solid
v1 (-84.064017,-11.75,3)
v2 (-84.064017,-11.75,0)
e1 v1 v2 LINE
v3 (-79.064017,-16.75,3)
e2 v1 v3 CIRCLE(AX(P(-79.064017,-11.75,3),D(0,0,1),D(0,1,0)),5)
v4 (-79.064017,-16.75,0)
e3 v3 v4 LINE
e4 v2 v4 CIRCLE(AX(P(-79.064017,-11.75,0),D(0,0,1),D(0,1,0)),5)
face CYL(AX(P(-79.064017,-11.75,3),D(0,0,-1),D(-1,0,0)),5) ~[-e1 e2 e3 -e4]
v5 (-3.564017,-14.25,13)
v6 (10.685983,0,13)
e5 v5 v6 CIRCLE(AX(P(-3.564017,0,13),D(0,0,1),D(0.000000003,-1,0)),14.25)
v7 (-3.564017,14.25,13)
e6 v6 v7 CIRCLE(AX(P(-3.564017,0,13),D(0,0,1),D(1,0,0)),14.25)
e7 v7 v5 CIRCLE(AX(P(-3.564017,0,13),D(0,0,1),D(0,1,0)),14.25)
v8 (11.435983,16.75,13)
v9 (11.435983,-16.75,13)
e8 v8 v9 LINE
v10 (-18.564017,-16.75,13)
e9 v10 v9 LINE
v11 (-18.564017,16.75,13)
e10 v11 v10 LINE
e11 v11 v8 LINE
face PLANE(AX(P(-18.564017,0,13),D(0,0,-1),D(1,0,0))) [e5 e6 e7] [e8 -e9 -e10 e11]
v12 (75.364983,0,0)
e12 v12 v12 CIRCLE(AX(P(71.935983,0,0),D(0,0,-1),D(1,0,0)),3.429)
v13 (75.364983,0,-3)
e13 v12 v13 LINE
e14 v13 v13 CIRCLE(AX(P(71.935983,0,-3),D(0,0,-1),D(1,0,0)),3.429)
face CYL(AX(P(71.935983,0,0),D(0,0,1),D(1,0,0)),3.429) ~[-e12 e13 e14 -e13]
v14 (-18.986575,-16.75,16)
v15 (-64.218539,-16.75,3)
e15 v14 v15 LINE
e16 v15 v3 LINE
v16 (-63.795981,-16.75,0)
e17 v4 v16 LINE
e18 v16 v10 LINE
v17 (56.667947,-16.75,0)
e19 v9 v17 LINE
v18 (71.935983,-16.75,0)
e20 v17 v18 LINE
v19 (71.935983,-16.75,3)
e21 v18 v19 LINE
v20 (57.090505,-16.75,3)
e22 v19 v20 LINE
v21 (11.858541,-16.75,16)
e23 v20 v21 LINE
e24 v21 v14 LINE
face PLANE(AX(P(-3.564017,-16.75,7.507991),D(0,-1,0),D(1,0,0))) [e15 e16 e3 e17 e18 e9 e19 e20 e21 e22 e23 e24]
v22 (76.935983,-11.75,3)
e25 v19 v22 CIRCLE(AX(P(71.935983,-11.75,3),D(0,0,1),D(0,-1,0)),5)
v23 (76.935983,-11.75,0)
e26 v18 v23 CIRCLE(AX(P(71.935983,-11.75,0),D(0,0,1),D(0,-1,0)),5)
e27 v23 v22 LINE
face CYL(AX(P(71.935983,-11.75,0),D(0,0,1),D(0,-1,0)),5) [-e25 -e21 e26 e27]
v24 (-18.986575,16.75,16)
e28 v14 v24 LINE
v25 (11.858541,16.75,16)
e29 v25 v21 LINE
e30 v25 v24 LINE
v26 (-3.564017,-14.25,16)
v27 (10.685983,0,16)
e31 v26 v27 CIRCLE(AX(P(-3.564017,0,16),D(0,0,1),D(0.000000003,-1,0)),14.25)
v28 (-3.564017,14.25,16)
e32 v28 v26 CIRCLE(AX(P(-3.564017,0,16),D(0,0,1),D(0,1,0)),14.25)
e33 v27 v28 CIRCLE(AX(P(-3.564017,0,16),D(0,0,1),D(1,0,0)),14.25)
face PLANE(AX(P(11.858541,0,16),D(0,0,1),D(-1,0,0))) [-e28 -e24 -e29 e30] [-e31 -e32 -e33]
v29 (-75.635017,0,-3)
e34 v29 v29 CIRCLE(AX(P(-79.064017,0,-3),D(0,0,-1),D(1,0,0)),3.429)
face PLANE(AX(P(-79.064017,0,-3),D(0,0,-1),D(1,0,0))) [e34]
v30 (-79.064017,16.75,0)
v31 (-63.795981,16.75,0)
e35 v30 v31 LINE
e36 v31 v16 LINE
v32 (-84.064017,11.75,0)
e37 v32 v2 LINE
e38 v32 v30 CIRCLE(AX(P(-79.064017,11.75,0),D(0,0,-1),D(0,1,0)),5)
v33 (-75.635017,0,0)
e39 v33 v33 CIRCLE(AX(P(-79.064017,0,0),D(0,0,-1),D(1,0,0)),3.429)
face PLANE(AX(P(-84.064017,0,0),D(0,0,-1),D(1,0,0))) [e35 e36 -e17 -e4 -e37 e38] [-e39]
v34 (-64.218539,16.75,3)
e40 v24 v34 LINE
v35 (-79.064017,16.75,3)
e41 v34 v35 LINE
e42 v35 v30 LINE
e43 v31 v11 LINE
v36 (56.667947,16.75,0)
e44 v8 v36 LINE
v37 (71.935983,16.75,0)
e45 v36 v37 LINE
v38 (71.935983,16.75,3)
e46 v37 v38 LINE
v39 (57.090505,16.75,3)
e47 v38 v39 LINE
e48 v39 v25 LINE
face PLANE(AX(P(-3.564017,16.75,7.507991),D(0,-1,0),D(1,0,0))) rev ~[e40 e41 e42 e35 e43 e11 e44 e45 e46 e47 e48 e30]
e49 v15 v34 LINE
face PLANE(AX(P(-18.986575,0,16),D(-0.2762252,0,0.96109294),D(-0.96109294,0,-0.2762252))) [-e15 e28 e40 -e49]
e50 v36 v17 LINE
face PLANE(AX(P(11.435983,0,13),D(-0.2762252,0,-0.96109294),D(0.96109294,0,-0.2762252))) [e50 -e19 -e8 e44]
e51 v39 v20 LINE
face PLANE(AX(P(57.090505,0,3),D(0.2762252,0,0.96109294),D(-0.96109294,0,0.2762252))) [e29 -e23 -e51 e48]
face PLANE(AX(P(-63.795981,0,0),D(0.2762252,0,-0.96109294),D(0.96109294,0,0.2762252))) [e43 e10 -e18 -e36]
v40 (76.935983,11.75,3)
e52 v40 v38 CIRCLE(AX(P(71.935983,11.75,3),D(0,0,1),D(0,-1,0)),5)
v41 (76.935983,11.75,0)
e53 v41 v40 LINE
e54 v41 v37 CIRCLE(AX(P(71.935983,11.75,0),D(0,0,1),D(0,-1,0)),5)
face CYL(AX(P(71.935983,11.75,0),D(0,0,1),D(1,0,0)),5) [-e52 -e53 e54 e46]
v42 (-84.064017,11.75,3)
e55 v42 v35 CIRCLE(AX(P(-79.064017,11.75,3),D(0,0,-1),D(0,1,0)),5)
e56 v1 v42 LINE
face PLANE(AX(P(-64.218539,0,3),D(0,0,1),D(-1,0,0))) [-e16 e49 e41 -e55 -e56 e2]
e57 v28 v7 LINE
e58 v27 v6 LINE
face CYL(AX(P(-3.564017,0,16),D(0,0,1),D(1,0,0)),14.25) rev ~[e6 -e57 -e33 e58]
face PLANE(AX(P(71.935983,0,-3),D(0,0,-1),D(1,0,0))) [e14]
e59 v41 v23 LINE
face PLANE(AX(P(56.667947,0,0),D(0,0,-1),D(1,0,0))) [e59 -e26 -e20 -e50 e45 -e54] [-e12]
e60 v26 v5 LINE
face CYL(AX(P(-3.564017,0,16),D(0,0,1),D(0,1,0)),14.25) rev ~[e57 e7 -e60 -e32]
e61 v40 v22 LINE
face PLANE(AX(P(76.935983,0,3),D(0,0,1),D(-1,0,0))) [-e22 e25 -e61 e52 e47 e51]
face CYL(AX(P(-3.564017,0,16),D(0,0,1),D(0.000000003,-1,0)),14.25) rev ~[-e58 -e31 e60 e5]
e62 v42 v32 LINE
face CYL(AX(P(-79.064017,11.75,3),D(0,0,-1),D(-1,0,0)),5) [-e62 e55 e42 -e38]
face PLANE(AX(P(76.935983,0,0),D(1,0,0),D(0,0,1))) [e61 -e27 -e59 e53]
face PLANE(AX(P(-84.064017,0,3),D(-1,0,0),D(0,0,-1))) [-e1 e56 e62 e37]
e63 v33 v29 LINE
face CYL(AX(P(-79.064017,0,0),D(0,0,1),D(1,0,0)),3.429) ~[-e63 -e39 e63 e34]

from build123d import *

# Parameters (mm, degrees)
F2_DEPTH = 16.75
F4_DEPTH = 16.001
F5_R     = 3.429
F6_R     = 3.429
F7_DEPTH = 3
F8_R     = 5
F9_R     = 5
F10_R    = 5
F11_R    = 5


with BuildPart() as f2:
    # F1 (on Front) → F2 (new body, symmetric)
    with BuildSketch(Plane.XZ):
        Polygon((-84.0640169114, 3), (-84.0640169114, 0), (-63.7959806109, 0), (-18.5640169114, 13), (11.4359830886, 13), (56.667946788, 0), (76.9359830886, 0), (76.9359830886, 3), (57.0905048336, 3), (11.8585411342, 16), (-18.986574957, 16), (-64.2185386565, 3), align=None)
    extrude(amount=F2_DEPTH, both=True)

    # F3 (on face) → F4 (cut, through all)
    with BuildSketch(Plane.XY.offset(16)):
        with BuildLine():
            ThreePointArc((-3.5640168758, -14.25), (6.5122547331, -10.0762716193), (10.6859830886, 0))
            ThreePointArc((10.6859830886, 0), (6.5122547205, 10.0762716319), (-3.5640169114, 14.25))
            ThreePointArc((-3.5640169114, 14.25), (-17.8140169114, -1.78e-08), (-3.5640168758, -14.25))
        make_face()
    extrude(amount=-F4_DEPTH, mode=Mode.SUBTRACT)

    # F5 (on face) + F6 (on face) → F7 (join)
    with BuildSketch(Plane(origin=(0, 0, 0), x_dir=(1, 0, 0), z_dir=(0, 0, -1))):
        with Locations((-79.0640169114, 0)):
            Circle(F5_R)
    with BuildSketch(Plane(origin=(0, 0, 0), x_dir=(1, 0, 0), z_dir=(0, 0, -1))):
        with Locations((71.9359830886, 0)):
            Circle(F6_R)
    extrude(amount=F7_DEPTH)

    # F8
    f8_edges = [f2.edges().sort_by_distance(p)[0] for p in [
        (-84.064017, -16.75, 1.5),
    ]]
    fillet(f8_edges, radius=F8_R)

    # F9
    f9_edges = [f2.edges().sort_by_distance(p)[0] for p in [
        (-84.064017, 16.75, 1.5),
    ]]
    fillet(f9_edges, radius=F9_R)

    # F10
    f10_edges = [f2.edges().sort_by_distance(p)[0] for p in [
        (76.935983, -16.75, 1.5),
    ]]
    fillet(f10_edges, radius=F10_R)

    # F11
    f11_edges = [f2.edges().sort_by_distance(p)[0] for p in [
        (76.935983, 16.75, 1.5),
    ]]
    fillet(f11_edges, radius=F11_R)


solid = f2.part
